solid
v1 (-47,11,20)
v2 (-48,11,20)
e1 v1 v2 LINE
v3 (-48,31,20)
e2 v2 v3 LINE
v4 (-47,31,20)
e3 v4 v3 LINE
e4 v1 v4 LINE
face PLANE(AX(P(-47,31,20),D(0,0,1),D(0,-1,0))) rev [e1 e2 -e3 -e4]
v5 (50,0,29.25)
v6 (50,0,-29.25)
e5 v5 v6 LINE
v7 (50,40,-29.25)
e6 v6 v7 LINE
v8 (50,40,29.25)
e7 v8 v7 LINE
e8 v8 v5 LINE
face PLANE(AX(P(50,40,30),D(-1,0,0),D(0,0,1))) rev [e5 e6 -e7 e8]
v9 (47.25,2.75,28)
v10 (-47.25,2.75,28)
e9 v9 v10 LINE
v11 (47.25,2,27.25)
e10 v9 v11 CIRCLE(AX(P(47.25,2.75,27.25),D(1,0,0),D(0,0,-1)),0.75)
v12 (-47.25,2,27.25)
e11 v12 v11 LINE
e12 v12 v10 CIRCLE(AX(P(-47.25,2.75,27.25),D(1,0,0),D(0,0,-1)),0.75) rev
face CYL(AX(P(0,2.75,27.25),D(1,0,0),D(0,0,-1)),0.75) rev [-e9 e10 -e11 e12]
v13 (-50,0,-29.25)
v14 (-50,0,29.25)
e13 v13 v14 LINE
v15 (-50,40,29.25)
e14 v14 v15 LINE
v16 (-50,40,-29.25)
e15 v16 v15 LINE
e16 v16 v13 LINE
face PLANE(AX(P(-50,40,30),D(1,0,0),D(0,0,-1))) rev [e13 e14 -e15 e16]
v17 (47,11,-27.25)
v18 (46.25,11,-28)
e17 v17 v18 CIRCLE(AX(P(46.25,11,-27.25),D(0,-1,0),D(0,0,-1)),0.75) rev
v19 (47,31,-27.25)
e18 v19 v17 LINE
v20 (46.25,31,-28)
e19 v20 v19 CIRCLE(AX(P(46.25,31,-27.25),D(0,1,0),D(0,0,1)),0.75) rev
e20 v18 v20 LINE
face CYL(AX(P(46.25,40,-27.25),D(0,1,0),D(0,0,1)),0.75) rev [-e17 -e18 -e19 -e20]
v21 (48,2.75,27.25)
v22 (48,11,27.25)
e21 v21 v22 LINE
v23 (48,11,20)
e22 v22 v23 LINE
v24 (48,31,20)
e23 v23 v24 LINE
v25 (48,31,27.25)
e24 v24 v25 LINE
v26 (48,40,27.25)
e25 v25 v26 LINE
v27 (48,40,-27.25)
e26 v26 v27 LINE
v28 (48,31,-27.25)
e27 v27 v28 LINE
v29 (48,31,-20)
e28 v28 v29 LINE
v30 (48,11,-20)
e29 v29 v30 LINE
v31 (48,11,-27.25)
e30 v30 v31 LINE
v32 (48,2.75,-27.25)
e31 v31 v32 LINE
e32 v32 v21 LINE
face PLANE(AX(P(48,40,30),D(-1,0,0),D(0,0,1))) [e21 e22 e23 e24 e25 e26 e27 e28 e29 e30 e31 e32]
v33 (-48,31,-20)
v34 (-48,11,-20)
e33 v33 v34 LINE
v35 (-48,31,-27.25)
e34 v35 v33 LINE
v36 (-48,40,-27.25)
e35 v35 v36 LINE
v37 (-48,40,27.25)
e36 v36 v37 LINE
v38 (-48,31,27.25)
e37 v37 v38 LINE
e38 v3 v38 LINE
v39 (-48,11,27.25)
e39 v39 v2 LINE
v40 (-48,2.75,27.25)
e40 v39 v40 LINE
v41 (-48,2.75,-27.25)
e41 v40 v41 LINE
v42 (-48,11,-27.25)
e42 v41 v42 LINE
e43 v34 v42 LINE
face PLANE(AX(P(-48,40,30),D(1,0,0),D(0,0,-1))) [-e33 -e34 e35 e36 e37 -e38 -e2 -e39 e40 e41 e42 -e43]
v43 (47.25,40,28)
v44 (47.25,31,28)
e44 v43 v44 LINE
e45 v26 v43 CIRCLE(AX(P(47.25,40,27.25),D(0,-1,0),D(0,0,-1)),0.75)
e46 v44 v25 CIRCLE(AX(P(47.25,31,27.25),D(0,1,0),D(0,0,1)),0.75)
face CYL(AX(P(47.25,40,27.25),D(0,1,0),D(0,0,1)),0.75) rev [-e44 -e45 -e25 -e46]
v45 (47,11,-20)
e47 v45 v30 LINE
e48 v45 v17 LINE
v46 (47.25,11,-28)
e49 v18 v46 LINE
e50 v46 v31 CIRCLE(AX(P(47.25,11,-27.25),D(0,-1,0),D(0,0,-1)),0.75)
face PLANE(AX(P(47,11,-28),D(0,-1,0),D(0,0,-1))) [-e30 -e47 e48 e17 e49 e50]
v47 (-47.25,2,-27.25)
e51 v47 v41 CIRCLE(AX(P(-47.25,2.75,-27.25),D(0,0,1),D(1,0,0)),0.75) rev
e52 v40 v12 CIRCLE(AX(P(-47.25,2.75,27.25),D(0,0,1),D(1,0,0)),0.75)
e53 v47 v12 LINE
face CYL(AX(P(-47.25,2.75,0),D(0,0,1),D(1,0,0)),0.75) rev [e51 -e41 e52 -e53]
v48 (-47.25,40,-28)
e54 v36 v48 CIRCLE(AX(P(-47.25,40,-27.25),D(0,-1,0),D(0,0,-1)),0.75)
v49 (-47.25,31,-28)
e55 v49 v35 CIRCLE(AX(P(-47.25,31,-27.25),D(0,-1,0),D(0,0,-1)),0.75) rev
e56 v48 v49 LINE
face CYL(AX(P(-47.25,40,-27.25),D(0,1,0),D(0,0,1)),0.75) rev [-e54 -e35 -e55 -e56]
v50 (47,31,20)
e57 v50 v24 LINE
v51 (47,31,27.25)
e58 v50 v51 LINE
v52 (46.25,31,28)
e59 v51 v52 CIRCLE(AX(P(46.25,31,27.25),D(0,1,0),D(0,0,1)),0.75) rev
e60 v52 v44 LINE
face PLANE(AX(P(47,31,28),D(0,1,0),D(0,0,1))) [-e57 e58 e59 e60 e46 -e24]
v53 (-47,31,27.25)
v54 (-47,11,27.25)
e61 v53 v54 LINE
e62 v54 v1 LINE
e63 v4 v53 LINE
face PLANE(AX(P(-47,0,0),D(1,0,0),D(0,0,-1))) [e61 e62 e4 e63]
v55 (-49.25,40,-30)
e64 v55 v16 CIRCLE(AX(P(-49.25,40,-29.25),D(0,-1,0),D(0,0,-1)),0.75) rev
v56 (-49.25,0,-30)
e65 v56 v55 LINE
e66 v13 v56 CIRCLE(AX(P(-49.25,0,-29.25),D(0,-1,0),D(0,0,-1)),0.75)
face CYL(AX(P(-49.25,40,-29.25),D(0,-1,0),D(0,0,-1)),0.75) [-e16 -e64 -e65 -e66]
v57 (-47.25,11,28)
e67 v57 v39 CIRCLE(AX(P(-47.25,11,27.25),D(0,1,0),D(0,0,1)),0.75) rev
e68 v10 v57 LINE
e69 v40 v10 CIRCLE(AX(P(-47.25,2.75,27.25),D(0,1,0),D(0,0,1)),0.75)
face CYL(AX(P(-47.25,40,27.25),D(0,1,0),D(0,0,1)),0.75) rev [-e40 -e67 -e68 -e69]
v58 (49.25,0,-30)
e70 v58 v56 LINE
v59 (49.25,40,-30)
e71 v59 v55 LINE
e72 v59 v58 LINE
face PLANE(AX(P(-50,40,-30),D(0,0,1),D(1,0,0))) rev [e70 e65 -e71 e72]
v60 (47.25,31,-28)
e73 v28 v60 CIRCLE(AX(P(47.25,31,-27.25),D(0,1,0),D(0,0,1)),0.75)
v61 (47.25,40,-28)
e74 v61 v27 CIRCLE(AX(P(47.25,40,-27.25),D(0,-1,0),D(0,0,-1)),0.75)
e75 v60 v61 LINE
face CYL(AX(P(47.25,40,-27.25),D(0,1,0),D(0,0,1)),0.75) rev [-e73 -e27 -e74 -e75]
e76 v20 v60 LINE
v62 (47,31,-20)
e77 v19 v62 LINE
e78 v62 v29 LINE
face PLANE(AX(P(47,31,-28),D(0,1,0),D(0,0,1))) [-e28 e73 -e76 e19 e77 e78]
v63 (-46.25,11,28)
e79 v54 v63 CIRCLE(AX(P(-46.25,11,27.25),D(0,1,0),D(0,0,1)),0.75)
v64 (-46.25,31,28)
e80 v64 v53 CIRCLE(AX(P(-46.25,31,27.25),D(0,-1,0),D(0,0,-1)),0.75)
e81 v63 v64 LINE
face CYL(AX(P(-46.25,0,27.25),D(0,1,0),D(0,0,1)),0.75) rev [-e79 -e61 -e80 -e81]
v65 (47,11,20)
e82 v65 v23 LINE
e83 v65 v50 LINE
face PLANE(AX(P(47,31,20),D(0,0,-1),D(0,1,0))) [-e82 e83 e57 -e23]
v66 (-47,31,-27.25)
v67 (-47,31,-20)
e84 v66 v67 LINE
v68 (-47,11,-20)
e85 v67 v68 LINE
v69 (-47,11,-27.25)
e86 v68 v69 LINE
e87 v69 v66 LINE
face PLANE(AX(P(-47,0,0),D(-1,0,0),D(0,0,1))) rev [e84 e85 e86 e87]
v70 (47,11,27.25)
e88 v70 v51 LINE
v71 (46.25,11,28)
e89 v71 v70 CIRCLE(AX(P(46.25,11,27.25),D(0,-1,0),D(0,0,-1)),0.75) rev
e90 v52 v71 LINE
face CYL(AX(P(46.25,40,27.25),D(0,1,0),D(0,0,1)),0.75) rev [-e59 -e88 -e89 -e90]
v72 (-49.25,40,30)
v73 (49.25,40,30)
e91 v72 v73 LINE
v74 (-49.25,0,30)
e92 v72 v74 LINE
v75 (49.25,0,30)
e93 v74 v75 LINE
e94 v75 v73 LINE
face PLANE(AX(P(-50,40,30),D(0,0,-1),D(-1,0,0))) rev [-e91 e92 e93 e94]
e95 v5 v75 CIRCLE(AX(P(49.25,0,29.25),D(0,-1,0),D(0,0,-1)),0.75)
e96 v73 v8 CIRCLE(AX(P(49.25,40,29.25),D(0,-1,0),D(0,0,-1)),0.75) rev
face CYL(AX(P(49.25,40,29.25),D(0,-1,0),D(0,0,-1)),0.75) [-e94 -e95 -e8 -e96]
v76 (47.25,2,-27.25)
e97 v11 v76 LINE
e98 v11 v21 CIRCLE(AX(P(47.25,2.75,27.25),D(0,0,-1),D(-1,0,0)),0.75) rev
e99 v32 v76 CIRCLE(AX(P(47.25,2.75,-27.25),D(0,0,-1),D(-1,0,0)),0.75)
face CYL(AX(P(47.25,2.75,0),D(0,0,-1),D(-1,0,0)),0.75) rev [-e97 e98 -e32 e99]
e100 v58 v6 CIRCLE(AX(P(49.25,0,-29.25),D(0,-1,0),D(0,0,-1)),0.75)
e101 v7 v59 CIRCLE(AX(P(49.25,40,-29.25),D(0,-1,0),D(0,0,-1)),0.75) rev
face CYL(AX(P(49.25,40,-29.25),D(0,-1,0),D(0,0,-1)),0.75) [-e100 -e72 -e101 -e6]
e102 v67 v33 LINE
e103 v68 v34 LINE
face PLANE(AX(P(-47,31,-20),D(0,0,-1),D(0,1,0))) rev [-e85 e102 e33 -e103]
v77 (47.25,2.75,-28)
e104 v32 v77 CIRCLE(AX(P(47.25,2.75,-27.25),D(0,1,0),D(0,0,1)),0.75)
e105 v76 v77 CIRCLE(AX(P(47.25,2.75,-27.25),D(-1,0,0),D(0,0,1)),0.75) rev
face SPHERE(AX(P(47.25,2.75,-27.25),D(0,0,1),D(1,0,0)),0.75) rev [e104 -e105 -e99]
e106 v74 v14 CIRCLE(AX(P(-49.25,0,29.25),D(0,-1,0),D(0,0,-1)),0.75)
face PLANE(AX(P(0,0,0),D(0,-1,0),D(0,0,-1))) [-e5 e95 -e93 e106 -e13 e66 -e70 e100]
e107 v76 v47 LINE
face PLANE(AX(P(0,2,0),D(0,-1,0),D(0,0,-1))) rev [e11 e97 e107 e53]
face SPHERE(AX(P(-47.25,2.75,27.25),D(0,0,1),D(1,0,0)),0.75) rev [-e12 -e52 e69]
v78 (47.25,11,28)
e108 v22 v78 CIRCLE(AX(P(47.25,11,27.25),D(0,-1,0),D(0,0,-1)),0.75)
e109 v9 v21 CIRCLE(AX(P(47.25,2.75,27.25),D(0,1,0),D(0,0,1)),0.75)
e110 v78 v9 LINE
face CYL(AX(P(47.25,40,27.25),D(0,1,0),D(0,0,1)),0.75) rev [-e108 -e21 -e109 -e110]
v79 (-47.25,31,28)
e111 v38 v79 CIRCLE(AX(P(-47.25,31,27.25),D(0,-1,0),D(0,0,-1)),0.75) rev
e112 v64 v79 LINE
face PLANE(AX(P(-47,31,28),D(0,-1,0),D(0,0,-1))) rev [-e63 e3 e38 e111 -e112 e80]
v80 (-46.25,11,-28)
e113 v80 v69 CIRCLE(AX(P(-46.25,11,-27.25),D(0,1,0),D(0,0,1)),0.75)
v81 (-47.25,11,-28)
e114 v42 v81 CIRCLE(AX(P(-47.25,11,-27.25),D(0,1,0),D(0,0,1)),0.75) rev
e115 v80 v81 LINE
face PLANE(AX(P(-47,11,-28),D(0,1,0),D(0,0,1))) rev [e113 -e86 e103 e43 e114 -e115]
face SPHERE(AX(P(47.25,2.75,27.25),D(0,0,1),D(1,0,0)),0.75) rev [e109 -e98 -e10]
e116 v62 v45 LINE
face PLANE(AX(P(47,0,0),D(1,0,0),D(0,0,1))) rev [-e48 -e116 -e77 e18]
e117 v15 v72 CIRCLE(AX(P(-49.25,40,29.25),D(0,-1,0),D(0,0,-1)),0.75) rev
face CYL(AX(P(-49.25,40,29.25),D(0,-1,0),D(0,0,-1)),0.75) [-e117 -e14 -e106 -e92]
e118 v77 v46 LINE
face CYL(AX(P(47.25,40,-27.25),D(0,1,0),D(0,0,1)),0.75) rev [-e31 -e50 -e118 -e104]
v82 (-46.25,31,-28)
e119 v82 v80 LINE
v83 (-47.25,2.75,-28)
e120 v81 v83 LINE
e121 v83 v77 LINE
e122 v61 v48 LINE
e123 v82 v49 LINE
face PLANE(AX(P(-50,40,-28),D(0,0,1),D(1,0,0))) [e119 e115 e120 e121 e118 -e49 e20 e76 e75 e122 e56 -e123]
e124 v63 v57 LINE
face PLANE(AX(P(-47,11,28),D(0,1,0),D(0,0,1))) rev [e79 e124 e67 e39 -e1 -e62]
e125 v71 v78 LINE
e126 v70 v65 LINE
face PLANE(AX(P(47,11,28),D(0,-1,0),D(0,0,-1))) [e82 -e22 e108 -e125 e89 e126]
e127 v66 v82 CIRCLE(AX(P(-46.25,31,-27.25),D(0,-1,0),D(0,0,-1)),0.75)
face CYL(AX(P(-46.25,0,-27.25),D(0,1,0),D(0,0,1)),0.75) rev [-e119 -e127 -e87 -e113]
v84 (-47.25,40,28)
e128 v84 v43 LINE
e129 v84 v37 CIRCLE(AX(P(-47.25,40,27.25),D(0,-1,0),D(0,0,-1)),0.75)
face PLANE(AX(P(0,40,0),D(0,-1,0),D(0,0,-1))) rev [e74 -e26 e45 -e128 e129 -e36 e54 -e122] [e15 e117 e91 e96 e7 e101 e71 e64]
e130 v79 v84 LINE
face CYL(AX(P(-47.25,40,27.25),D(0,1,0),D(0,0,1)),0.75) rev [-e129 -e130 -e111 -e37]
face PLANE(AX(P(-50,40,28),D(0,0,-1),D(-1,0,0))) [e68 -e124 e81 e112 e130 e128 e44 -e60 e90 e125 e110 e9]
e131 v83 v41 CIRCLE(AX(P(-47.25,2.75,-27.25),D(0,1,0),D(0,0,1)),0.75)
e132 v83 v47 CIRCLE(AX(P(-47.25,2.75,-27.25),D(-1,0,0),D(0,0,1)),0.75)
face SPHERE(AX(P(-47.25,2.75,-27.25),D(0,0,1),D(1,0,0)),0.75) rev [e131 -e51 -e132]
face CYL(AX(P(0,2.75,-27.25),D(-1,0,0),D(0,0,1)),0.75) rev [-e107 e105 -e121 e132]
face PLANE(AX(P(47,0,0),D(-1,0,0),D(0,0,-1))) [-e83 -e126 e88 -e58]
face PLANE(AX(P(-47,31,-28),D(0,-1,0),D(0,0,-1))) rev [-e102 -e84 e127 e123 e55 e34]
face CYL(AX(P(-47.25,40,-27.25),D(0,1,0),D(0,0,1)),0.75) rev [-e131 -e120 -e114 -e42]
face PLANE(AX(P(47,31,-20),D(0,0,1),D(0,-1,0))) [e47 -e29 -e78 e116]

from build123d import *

# Parameters (mm, degrees)
SKETCH10_W          = 100
SKETCH10_H          = 60
BOSS_EXTRUDE2_DEPTH = 40
SHELL1_T            = -2
SKETCH11_W          = 8
SKETCH11_H          = 20
BOSS_EXTRUDE3_DEPTH = 1
FILLET1_R           = 0.75
FILLET2_R           = 0.75
FILLET3_R           = 0.75
FILLET4_R           = 0.75
FILLET5_R           = 0.75


with BuildPart() as part:
    # Sketch10 → Boss-Extrude2 (new body)
    with BuildSketch(Plane(origin=(0, 0, 0), x_dir=(1, 0, 0), z_dir=(0, 1, 0))):
        Rectangle(SKETCH10_W, SKETCH10_H)
    extrude(amount=BOSS_EXTRUDE2_DEPTH)

    # Shell1
    shell1_openings = [part.faces().sort_by_distance(p)[0] for p in [
        (0, 40, 0),
    ]]
    offset(amount=SHELL1_T, openings=shell1_openings, kind=Kind.INTERSECTION)

    # Sketch11 → Boss-Extrude3 (add)
    with BuildSketch(Plane(origin=(-48, 0, 0), x_dir=(0, 0, -1), z_dir=(1, 0, 0))):
        with Locations((24, 21)):
            Rectangle(SKETCH11_W, SKETCH11_H)
        with Locations((-24, 21)):
            Rectangle(SKETCH11_W, SKETCH11_H)
    boss_extrude3 = extrude(amount=BOSS_EXTRUDE3_DEPTH)

    # Fillet1
    fillet1_edges = [part.edges().sort_by_distance(p)[0] for p in [
        (-47, 21, -28),
        (-47, 21, 28),
    ]]
    fillet(fillet1_edges, radius=FILLET1_R)

    # Mirror1: Boss-Extrude3 across plane
    add(boss_extrude3.mirror(Plane(origin=(0, 0, 0), x_dir=(0, 0, 1), z_dir=(1, 0, 0))))

    # Fillet2
    fillet2_edges = [part.edges().sort_by_distance(p)[0] for p in [
        (47, 21, -28),
        (47, 21, 28),
    ]]
    fillet(fillet2_edges, radius=FILLET2_R)

    # Fillet3
    fillet3_edges = [part.edges().sort_by_distance(p)[0] for p in [
        (48, 2, 0),
        (0, 2, -28),
        (-48, 2, 0),
        (0, 2, 28),
    ]]
    fillet(fillet3_edges, radius=FILLET3_R)

    # Fillet4
    fillet4_edges = [part.edges().sort_by_distance(p)[0] for p in [
        (50, 20, 30),
        (-50, 20, 30),
        (-50, 20, -30),
        (50, 20, -30),
    ]]
    fillet(fillet4_edges, radius=FILLET4_R)

    # Fillet5
    # the kernel refuses this fillet: 0.75 mm, written as the material it adds along each edge
    with BuildSketch(Plane(origin=(-47.25, 2.75, -27.25), x_dir=(0, 0, -1), z_dir=(-1, 0, 0))) as fillet5_piece_1_section:
        Polygon((0, 0), (FILLET5_R, 0), (FILLET5_R, FILLET5_R), (0, FILLET5_R), align=None)
    fillet5_piece_1 = extrude(amount=FILLET5_R, mode=Mode.PRIVATE)
    fillet5_piece_1 = fillet5_piece_1 - Plane(origin=(-47.25, 2.75, -27.25), x_dir=(0, 0.7071067811865475, 0.7071067811865475), z_dir=(-1, 0, 0)) * Sphere(FILLET5_R, mode=Mode.PRIVATE)
    add(fillet5_piece_1)
    with BuildSketch(Plane(origin=(47.25, 2.75, -27.25), x_dir=(1, 0, 0), z_dir=(0, 0, -1))) as fillet5_piece_2_section:
        Polygon((0, 0), (FILLET5_R, 0), (FILLET5_R, FILLET5_R), (0, FILLET5_R), align=None)
    fillet5_piece_2 = extrude(amount=FILLET5_R, mode=Mode.PRIVATE)
    fillet5_piece_2 = fillet5_piece_2 - Plane(origin=(47.25, 2.75, -27.25), x_dir=(-0.7071067811865475, 0.7071067811865475, 0), z_dir=(0, 0, -1)) * Sphere(FILLET5_R, mode=Mode.PRIVATE)
    add(fillet5_piece_2)
    with BuildSketch(Plane(origin=(-47.25, 2.75, 27.25), x_dir=(-1, 0, 0), z_dir=(0, 0, 1))) as fillet5_piece_3_section:
        Polygon((0, 0), (FILLET5_R, 0), (FILLET5_R, FILLET5_R), (0, FILLET5_R), align=None)
    fillet5_piece_3 = extrude(amount=FILLET5_R, mode=Mode.PRIVATE)
    fillet5_piece_3 = fillet5_piece_3 - Plane(origin=(-47.25, 2.75, 27.25), x_dir=(0.7071067811865475, 0.7071067811865475, 0), z_dir=(0, 0, 1)) * Sphere(FILLET5_R, mode=Mode.PRIVATE)
    add(fillet5_piece_3)
    with BuildSketch(Plane(origin=(47.25, 2.75, 27.25), x_dir=(1, 0, 0), z_dir=(0, 0, 1))) as fillet5_piece_4_section:
        Polygon((0, 0), (FILLET5_R, 0), (FILLET5_R, -FILLET5_R), (0, -FILLET5_R), align=None)
    fillet5_piece_4 = extrude(amount=FILLET5_R, mode=Mode.PRIVATE)
    fillet5_piece_4 = fillet5_piece_4 - Plane(origin=(47.25, 2.75, 27.25), x_dir=(-0.7071067811865475, 0.7071067811865475, 0), z_dir=(0, 0, 1)) * Sphere(FILLET5_R, mode=Mode.PRIVATE)
    add(fillet5_piece_4)
    with BuildSketch(Plane(origin=(48, 29.125, 28), x_dir=(-1, 0, 0), z_dir=(0, 1, 0)), Plane(origin=(-48, 40, 28), x_dir=(1, 0, 0), z_dir=(0, -1, 0))) as fillet5_piece_5:
        with BuildLine():
            CenterArc((FILLET5_R, -FILLET5_R), FILLET5_R, 90, 90)
            Line((0, -FILLET5_R), (0, 0))
            Line((0, 0), (FILLET5_R, 0))
        make_face()
    extrude(amount=10.875)
    with BuildSketch(Plane(origin=(48, 29.125, -28), x_dir=(-1, 0, 0), z_dir=(0, 1, 0)), Plane(origin=(-48, 29.125, -28), x_dir=(0, 0, 1), z_dir=(0, 1, 0))) as fillet5_piece_6:
        with BuildLine():
            CenterArc((FILLET5_R, FILLET5_R), FILLET5_R, 180, 90)
            Line((0, FILLET5_R), (0, 0))
            Line((0, 0), (FILLET5_R, 0))
        make_face()
    extrude(amount=10.875)
    with BuildSketch(Plane(origin=(-48, 2.75, -28), x_dir=(0, 0, 1), z_dir=(0, 1, 0)), Plane(origin=(48, 2.75, -28), x_dir=(-1, 0, 0), z_dir=(0, 1, 0))) as fillet5_piece_7:
        with BuildLine():
            CenterArc((FILLET5_R, FILLET5_R), FILLET5_R, 180, 90)
            Line((0, FILLET5_R), (0, 0))
            Line((0, 0), (FILLET5_R, 0))
        make_face()
    extrude(amount=10.125)
    with BuildSketch(Plane(origin=(-48, 12.875, 28), x_dir=(1, 0, 0), z_dir=(0, -1, 0)), Plane(origin=(48, 2.75, 28), x_dir=(-1, 0, 0), z_dir=(0, 1, 0))) as fillet5_piece_8:
        with BuildLine():
            CenterArc((FILLET5_R, -FILLET5_R), FILLET5_R, 90, 90)
            Line((0, -FILLET5_R), (0, 0))
            Line((0, 0), (FILLET5_R, 0))
        make_face()
    extrude(amount=10.125)


solid = part.part
